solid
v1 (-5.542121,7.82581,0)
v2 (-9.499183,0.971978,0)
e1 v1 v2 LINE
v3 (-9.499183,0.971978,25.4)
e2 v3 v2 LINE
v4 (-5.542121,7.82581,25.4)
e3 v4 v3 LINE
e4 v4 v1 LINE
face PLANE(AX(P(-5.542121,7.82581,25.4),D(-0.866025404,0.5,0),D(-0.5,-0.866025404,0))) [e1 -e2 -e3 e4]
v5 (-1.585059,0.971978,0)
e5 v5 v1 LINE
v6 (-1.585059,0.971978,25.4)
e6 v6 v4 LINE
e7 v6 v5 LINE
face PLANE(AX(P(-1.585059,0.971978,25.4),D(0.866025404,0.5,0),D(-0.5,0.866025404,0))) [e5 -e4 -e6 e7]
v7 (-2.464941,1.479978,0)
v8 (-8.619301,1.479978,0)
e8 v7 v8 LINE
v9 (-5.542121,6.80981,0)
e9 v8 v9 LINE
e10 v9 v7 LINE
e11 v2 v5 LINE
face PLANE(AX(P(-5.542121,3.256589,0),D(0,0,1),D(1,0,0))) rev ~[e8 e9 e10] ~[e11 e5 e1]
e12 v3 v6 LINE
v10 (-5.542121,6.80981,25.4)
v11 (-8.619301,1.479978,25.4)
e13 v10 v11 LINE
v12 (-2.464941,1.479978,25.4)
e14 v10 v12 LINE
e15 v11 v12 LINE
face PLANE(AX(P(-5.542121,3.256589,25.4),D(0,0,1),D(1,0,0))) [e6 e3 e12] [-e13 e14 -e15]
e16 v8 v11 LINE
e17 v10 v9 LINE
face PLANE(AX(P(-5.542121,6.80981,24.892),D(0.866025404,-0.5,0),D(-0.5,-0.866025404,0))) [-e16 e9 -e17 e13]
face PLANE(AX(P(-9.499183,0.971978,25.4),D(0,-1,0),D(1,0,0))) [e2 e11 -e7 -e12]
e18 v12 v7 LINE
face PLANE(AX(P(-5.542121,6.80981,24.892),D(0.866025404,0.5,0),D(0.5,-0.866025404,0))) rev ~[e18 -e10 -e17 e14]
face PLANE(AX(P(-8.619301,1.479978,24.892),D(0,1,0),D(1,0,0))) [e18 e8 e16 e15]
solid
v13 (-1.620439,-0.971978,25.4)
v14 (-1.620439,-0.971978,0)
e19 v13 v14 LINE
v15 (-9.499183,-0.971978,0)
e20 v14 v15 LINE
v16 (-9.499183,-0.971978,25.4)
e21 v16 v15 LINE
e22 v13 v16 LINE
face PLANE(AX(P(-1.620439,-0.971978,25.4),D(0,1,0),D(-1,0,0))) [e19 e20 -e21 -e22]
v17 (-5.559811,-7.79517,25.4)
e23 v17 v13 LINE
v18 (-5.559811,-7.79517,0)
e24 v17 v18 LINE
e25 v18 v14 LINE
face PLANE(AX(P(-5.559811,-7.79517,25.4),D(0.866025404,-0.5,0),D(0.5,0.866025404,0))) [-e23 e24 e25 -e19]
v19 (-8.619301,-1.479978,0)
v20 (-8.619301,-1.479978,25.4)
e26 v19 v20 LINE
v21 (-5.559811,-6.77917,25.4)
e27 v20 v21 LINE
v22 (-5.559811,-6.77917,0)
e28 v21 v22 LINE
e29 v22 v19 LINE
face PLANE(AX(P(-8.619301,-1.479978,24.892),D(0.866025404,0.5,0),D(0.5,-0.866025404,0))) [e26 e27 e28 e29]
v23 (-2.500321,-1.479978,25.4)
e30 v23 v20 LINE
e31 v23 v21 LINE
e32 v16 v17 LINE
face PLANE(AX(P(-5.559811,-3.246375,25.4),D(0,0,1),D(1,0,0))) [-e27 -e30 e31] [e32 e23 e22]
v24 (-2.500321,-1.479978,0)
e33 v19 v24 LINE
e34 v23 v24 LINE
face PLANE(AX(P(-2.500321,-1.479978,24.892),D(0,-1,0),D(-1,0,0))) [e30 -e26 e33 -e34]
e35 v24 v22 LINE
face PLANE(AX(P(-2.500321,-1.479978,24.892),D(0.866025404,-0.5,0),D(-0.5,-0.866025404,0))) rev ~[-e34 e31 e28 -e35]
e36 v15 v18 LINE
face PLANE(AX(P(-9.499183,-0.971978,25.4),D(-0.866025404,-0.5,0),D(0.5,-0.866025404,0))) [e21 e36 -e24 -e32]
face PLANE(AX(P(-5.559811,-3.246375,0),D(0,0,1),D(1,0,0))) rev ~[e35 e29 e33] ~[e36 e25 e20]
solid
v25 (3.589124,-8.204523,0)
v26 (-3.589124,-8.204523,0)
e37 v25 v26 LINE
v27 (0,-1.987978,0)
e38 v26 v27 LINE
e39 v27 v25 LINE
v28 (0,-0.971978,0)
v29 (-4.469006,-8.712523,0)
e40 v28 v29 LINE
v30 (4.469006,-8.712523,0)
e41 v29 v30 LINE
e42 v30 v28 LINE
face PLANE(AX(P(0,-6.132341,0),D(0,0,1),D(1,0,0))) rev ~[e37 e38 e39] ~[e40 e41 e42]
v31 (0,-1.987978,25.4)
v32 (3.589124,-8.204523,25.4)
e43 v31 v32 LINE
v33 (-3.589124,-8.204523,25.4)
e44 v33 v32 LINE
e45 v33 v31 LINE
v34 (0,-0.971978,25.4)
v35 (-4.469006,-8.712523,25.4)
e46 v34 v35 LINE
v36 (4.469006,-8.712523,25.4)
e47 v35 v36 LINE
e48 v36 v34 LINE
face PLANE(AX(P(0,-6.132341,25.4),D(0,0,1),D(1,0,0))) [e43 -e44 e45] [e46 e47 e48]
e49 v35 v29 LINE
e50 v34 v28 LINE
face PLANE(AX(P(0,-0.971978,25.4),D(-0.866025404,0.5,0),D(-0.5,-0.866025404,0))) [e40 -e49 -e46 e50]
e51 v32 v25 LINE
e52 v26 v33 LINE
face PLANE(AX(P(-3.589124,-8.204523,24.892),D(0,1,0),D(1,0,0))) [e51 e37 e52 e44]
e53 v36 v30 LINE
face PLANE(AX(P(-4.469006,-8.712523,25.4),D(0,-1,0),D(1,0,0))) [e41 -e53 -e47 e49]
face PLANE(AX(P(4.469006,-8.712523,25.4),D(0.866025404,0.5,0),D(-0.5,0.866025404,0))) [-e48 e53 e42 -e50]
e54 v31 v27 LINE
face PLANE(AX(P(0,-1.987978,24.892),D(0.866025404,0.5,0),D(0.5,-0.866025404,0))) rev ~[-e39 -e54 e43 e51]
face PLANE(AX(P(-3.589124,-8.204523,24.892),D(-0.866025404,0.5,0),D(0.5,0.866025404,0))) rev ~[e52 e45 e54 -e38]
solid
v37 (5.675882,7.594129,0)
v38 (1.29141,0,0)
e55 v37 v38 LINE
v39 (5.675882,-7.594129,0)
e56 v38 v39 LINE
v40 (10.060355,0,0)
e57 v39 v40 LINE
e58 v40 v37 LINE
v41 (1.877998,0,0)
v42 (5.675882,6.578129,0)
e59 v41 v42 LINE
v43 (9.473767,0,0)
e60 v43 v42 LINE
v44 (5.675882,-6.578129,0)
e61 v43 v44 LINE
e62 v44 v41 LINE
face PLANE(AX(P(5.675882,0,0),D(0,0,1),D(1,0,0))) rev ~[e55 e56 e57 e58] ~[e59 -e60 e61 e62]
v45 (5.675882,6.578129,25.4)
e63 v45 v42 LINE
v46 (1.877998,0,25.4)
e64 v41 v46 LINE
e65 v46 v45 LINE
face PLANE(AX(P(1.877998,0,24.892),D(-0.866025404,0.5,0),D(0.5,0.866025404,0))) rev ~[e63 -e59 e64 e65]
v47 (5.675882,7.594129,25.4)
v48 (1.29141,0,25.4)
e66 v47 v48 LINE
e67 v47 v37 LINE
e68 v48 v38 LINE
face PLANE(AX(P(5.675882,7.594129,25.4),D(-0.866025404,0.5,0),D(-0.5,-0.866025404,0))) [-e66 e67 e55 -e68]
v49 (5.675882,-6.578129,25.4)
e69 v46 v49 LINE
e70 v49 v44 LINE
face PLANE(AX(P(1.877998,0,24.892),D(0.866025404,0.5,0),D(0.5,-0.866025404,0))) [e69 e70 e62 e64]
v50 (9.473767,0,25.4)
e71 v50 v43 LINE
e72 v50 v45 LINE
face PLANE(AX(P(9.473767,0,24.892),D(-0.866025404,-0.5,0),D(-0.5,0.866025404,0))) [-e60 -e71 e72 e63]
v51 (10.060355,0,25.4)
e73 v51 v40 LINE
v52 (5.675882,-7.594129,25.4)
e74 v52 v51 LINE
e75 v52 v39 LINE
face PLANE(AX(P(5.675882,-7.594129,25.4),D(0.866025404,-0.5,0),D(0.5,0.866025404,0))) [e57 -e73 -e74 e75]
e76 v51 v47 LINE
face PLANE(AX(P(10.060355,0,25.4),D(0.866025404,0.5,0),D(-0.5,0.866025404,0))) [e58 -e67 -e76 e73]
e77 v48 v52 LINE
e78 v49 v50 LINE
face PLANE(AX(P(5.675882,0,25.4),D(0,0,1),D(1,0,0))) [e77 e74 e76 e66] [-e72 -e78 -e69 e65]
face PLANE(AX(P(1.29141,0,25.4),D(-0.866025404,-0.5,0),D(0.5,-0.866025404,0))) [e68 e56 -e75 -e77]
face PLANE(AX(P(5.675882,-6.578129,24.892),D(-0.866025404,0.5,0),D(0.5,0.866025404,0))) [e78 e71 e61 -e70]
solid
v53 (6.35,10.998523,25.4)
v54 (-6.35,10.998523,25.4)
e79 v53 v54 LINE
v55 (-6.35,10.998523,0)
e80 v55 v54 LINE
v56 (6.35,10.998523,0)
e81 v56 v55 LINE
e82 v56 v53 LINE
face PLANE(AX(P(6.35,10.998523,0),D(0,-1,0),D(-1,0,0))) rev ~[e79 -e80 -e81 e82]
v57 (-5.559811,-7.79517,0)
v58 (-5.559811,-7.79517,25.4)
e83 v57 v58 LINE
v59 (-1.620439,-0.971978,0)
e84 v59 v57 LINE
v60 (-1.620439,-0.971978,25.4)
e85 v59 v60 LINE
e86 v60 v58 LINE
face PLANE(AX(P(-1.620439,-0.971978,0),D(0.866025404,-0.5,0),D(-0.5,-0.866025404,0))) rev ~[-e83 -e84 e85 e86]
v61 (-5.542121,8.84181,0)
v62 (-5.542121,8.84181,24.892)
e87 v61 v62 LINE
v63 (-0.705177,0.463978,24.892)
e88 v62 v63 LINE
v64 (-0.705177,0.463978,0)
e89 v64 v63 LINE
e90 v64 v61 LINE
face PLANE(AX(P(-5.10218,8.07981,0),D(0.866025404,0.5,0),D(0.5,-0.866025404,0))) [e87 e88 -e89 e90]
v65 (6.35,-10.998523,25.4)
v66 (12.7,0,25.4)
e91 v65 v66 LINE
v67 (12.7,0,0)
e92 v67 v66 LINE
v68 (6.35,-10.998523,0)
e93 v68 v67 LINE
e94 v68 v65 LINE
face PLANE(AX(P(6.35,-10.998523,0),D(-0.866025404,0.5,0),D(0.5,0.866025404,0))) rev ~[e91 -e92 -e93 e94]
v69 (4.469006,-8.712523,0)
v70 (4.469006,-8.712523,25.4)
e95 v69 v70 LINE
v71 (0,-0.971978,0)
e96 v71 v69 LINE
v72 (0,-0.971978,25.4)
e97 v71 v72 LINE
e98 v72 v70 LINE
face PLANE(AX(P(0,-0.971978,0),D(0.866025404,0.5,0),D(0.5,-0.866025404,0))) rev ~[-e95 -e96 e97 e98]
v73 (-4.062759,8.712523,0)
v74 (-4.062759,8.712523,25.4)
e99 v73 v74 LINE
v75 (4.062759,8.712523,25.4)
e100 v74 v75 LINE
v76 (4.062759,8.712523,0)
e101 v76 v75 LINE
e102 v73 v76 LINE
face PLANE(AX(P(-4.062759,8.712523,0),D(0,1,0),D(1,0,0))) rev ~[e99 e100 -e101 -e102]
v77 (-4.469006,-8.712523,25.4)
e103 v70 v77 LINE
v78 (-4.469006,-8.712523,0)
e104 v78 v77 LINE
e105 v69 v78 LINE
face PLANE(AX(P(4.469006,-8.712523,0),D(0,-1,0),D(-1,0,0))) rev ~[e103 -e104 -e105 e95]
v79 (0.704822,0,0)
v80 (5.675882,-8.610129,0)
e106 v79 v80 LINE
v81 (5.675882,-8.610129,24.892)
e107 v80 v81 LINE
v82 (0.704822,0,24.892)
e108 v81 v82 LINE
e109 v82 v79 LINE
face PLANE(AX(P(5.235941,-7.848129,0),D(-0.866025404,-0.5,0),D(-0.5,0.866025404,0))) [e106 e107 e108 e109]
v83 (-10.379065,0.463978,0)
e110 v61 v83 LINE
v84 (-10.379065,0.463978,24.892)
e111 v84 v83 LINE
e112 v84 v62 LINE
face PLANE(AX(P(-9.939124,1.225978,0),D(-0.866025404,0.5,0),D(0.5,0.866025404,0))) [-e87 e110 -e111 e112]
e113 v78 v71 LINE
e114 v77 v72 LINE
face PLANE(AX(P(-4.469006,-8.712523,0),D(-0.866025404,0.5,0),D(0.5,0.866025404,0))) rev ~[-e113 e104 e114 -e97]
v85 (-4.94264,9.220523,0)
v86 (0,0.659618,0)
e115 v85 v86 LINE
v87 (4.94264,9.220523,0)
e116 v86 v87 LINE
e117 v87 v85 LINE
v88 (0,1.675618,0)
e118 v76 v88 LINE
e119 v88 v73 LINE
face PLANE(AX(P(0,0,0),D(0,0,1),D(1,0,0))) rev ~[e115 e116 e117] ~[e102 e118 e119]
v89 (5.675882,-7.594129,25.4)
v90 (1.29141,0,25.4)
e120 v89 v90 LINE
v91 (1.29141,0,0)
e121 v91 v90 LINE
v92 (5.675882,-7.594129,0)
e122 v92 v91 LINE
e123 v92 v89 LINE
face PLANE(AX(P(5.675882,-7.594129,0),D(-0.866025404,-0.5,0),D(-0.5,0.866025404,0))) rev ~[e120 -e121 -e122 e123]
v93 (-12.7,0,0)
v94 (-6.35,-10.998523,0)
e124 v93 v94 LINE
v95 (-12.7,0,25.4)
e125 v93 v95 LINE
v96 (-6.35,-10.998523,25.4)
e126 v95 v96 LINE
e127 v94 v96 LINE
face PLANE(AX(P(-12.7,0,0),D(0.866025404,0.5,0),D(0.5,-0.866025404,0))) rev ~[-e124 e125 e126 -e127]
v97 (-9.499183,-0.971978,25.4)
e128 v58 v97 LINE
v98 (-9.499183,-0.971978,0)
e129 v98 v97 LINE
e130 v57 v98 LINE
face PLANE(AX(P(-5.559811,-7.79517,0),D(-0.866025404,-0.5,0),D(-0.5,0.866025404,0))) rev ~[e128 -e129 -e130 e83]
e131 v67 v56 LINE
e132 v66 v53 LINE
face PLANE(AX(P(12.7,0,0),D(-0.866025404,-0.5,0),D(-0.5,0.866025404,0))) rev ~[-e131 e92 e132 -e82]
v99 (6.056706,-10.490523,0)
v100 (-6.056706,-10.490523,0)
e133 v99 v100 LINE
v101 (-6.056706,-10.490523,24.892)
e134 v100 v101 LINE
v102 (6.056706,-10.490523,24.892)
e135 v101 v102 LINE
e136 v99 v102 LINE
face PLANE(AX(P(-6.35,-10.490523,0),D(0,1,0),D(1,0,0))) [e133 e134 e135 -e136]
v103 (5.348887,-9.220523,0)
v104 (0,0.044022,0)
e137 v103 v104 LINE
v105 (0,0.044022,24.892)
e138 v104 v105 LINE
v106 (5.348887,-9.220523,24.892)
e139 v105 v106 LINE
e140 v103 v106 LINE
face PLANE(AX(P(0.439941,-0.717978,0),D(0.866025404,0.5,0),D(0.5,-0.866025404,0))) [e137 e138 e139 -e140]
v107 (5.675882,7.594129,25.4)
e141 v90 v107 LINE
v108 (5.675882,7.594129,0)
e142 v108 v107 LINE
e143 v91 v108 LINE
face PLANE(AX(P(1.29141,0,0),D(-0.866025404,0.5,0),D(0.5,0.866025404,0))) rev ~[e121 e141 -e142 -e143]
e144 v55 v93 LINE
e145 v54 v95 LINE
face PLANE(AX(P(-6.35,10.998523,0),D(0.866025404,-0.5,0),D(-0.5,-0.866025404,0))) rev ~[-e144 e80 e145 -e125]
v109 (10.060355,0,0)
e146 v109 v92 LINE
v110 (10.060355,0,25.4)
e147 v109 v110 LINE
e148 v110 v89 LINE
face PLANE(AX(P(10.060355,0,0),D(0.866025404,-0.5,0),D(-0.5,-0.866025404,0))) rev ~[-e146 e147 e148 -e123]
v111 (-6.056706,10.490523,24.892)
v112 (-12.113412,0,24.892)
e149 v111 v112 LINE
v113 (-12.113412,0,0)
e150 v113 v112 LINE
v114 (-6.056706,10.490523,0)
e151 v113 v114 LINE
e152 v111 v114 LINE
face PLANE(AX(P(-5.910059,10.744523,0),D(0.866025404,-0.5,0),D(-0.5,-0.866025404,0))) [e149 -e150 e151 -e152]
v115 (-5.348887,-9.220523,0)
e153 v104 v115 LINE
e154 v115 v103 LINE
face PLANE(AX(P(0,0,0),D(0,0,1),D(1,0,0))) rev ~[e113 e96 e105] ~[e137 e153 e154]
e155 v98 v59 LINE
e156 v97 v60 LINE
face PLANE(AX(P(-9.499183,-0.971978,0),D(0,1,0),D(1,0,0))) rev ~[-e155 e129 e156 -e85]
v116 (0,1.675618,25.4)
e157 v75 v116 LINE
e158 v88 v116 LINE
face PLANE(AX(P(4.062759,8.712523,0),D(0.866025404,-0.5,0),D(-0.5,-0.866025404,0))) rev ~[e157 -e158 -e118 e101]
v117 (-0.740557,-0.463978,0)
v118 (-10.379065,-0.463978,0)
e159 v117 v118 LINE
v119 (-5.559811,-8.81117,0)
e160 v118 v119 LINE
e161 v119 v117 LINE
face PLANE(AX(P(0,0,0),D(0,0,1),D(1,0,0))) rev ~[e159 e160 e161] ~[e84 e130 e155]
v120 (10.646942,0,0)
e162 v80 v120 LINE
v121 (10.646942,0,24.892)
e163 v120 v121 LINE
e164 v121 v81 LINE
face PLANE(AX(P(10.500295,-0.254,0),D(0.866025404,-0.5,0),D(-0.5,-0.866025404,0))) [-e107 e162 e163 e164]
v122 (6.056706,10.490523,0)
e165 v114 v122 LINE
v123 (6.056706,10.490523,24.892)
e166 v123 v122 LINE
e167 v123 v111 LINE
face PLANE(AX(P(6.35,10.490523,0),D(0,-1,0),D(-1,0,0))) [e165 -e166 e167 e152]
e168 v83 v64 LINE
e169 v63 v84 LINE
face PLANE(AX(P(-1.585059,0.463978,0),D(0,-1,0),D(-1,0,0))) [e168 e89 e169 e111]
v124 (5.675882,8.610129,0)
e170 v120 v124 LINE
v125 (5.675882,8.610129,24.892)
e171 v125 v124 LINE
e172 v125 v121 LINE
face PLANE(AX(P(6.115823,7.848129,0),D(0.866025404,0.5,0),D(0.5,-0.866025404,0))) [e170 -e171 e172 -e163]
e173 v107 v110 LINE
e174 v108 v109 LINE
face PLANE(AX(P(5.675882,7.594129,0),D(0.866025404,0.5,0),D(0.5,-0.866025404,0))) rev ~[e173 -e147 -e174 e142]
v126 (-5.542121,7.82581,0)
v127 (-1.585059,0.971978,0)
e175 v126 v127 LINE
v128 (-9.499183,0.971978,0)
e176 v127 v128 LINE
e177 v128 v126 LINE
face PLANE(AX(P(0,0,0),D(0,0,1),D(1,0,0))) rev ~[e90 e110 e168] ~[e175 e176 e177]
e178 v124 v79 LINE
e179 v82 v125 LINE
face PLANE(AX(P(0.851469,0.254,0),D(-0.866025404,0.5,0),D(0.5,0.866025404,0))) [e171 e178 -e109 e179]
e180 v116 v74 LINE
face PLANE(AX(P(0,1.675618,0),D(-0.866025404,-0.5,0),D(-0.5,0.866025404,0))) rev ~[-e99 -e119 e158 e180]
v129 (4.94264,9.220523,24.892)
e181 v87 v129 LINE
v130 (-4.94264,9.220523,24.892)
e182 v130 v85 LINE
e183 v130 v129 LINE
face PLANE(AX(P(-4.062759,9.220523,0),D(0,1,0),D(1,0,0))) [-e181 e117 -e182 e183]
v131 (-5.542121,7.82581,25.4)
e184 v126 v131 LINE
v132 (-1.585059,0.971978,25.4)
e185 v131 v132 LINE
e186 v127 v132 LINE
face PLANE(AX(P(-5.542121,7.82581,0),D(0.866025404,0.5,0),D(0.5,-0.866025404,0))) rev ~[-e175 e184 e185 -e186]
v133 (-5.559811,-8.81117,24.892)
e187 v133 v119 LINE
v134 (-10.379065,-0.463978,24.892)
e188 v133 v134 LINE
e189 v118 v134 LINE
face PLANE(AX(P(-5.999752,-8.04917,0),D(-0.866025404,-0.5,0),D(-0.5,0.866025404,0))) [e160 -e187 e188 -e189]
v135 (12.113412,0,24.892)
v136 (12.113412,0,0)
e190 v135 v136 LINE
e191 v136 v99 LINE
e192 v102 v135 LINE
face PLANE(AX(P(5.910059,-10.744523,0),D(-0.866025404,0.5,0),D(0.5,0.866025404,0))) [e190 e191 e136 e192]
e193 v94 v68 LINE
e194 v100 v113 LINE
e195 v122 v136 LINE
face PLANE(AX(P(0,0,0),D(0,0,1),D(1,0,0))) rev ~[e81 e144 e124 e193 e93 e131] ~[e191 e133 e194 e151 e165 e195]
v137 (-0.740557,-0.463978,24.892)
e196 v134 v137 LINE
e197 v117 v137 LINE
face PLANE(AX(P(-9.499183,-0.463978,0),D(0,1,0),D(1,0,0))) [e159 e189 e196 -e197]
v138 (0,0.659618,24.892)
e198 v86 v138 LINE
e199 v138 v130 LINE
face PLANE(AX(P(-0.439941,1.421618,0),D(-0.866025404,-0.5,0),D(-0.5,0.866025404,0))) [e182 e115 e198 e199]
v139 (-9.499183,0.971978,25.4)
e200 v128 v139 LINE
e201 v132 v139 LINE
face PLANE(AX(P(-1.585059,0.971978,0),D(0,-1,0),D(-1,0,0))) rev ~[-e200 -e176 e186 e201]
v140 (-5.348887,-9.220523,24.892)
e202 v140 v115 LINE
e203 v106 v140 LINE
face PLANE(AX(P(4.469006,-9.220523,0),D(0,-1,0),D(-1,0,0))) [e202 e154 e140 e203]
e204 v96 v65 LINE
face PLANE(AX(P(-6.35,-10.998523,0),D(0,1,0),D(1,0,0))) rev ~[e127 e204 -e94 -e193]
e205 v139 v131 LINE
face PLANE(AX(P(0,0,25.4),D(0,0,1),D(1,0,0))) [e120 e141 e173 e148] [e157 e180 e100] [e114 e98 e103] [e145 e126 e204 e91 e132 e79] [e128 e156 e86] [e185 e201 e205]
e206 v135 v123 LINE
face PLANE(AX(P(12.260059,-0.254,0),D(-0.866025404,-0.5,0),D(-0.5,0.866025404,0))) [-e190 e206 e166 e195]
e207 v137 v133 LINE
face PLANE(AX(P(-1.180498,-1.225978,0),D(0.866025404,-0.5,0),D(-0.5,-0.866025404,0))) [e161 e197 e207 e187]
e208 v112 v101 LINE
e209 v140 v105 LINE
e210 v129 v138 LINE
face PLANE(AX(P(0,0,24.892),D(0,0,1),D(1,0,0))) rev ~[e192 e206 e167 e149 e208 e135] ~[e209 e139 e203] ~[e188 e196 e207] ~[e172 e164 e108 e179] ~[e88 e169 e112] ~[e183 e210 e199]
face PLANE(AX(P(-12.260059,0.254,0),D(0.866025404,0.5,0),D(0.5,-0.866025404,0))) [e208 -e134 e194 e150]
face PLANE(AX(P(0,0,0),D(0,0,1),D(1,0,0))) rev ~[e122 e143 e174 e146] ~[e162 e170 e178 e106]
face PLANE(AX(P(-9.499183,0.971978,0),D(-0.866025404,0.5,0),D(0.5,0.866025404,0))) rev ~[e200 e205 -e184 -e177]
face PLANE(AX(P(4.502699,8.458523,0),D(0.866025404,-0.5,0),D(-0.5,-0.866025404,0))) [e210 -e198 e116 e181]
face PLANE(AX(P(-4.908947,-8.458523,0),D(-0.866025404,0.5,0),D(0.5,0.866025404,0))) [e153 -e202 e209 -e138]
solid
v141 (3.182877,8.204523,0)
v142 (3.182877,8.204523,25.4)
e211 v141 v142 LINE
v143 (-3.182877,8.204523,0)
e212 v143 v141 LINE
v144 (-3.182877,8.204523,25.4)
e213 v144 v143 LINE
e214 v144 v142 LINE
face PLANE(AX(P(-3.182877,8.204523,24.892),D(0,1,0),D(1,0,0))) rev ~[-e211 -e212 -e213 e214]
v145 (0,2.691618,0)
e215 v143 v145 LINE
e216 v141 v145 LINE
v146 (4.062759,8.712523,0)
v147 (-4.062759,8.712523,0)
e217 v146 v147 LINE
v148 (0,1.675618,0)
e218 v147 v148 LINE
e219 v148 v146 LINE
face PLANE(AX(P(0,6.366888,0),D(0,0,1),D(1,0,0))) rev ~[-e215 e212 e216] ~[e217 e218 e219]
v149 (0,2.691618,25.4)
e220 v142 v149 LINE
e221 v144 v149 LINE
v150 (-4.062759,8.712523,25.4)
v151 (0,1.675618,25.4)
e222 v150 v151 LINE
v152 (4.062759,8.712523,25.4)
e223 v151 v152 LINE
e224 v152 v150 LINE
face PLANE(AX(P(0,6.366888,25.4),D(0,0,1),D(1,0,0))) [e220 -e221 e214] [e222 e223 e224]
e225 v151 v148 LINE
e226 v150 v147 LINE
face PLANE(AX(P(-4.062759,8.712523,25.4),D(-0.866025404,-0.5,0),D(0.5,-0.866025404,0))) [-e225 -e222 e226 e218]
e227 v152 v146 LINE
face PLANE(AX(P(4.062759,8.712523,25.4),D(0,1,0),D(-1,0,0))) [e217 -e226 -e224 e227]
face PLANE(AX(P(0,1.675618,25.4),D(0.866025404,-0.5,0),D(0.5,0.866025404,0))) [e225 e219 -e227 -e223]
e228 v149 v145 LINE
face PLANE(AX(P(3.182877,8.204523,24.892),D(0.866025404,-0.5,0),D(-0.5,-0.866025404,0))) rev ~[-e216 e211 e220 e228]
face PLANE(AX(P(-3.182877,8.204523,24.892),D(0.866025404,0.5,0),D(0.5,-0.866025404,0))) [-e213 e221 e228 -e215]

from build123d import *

# Parameters (mm, degrees)
F4_DEPTH = 25.4
F5_DEPTH = 25.4
F6_T     = -0.508
F7_T     = -0.508


# Not quite as in the source:
# - a shell that OpenCascade refuses in one call is made with other operations: the cavity is built on its own and cut out


with BuildPart() as f4:
    # F1 (on Top) → F4 (new body)
    with BuildSketch(Plane.XY):
        Polygon((-6.35, 10.9985226281), (-12.7, 0), (-6.35, -10.9985226281), (6.35, -10.9985226281), (12.7, 0), (6.35, 10.9985226281), align=None)
        Polygon((-5.5598110337, -7.7951700653), (-9.4991829533, -0.9719777506), (-1.620439114, -0.9719777506), align=None, mode=Mode.SUBTRACT)
        Polygon((-4.4690056687, -8.7125226281), (0, -0.9719777506), (4.4690056687, -8.7125226281), align=None, mode=Mode.SUBTRACT)
        Polygon((1.2914098768, 0), (5.675882223, 7.5941288681), (10.0603545693, 0), (5.675882223, -7.5941288681), align=None, mode=Mode.SUBTRACT)
        Polygon((-9.4991829533, 0.9719777506), (-5.5421208235, 7.8258104081), (-1.5850586937, 0.9719777506), align=None, mode=Mode.SUBTRACT)
        Polygon((-4.0627585811, 8.7125226281), (4.0627585811, 8.7125226281), (0, 1.6756183468), align=None, mode=Mode.SUBTRACT)
    extrude(amount=F4_DEPTH)

    # F7
    f7_openings = [f4.faces().sort_by_distance(p)[0] for p in [
        (-0.332472, 0.12346, 0),
    ]]
    offset(amount=F7_T, openings=f7_openings, kind=Kind.INTERSECTION)


with BuildPart() as f5:
    # F3 (on offset) → F5 (new body)
    with BuildSketch(Plane.XY.offset(25.4)):
        Polygon((10.0603545693, 0), (5.675882223, 7.5941288681), (1.2914098768, 0), (5.675882223, -7.5941288681), align=None)
        Polygon((0, 1.6756183468), (4.0627585811, 8.7125226281), (-4.0627585811, 8.7125226281), align=None)
        Polygon((-1.5850586937, 0.9719777506), (-5.5421208235, 7.8258104081), (-9.4991829533, 0.9719777506), align=None)
        Polygon((-1.620439114, -0.9719777506), (-9.4991829533, -0.9719777506), (-5.5598110337, -7.7951700653), align=None)
        Polygon((4.4690056687, -8.7125226281), (0, -0.9719777506), (-4.4690056687, -8.7125226281), align=None)
    extrude(amount=-F5_DEPTH)

    # F6: a shell. OpenCascade refuses it in one call, so the cavity is built on its own and cut out:
    # the body offset inwards by the wall thickness, plus a prism from it out through each open face.
    f6_core = offset(f5.part, amount=F6_T, mode=Mode.PRIVATE)
    f6_exits = [f6_core.faces().sort_by_distance(p)[0] for p in [
        (5.675882, 0, 0.508),
        (0, -6.132341, 0.508),
        (-5.559811, -3.246375, 0.508),
        (-5.542121, 3.256589, 0.508),
        (0, 6.366888, 0.508),
        (-5.542121, 3.256589, 24.892),
        (0, 6.366888, 24.892),
        (5.675882, 0, 24.892),
        (0, -6.132341, 24.892),
        (-5.559811, -3.246375, 24.892),
    ]]
    add(f6_core, mode=Mode.SUBTRACT)
    extrude(f6_exits, amount=-F6_T, mode=Mode.SUBTRACT)


solid = Compound([f4.part, f5.part])
